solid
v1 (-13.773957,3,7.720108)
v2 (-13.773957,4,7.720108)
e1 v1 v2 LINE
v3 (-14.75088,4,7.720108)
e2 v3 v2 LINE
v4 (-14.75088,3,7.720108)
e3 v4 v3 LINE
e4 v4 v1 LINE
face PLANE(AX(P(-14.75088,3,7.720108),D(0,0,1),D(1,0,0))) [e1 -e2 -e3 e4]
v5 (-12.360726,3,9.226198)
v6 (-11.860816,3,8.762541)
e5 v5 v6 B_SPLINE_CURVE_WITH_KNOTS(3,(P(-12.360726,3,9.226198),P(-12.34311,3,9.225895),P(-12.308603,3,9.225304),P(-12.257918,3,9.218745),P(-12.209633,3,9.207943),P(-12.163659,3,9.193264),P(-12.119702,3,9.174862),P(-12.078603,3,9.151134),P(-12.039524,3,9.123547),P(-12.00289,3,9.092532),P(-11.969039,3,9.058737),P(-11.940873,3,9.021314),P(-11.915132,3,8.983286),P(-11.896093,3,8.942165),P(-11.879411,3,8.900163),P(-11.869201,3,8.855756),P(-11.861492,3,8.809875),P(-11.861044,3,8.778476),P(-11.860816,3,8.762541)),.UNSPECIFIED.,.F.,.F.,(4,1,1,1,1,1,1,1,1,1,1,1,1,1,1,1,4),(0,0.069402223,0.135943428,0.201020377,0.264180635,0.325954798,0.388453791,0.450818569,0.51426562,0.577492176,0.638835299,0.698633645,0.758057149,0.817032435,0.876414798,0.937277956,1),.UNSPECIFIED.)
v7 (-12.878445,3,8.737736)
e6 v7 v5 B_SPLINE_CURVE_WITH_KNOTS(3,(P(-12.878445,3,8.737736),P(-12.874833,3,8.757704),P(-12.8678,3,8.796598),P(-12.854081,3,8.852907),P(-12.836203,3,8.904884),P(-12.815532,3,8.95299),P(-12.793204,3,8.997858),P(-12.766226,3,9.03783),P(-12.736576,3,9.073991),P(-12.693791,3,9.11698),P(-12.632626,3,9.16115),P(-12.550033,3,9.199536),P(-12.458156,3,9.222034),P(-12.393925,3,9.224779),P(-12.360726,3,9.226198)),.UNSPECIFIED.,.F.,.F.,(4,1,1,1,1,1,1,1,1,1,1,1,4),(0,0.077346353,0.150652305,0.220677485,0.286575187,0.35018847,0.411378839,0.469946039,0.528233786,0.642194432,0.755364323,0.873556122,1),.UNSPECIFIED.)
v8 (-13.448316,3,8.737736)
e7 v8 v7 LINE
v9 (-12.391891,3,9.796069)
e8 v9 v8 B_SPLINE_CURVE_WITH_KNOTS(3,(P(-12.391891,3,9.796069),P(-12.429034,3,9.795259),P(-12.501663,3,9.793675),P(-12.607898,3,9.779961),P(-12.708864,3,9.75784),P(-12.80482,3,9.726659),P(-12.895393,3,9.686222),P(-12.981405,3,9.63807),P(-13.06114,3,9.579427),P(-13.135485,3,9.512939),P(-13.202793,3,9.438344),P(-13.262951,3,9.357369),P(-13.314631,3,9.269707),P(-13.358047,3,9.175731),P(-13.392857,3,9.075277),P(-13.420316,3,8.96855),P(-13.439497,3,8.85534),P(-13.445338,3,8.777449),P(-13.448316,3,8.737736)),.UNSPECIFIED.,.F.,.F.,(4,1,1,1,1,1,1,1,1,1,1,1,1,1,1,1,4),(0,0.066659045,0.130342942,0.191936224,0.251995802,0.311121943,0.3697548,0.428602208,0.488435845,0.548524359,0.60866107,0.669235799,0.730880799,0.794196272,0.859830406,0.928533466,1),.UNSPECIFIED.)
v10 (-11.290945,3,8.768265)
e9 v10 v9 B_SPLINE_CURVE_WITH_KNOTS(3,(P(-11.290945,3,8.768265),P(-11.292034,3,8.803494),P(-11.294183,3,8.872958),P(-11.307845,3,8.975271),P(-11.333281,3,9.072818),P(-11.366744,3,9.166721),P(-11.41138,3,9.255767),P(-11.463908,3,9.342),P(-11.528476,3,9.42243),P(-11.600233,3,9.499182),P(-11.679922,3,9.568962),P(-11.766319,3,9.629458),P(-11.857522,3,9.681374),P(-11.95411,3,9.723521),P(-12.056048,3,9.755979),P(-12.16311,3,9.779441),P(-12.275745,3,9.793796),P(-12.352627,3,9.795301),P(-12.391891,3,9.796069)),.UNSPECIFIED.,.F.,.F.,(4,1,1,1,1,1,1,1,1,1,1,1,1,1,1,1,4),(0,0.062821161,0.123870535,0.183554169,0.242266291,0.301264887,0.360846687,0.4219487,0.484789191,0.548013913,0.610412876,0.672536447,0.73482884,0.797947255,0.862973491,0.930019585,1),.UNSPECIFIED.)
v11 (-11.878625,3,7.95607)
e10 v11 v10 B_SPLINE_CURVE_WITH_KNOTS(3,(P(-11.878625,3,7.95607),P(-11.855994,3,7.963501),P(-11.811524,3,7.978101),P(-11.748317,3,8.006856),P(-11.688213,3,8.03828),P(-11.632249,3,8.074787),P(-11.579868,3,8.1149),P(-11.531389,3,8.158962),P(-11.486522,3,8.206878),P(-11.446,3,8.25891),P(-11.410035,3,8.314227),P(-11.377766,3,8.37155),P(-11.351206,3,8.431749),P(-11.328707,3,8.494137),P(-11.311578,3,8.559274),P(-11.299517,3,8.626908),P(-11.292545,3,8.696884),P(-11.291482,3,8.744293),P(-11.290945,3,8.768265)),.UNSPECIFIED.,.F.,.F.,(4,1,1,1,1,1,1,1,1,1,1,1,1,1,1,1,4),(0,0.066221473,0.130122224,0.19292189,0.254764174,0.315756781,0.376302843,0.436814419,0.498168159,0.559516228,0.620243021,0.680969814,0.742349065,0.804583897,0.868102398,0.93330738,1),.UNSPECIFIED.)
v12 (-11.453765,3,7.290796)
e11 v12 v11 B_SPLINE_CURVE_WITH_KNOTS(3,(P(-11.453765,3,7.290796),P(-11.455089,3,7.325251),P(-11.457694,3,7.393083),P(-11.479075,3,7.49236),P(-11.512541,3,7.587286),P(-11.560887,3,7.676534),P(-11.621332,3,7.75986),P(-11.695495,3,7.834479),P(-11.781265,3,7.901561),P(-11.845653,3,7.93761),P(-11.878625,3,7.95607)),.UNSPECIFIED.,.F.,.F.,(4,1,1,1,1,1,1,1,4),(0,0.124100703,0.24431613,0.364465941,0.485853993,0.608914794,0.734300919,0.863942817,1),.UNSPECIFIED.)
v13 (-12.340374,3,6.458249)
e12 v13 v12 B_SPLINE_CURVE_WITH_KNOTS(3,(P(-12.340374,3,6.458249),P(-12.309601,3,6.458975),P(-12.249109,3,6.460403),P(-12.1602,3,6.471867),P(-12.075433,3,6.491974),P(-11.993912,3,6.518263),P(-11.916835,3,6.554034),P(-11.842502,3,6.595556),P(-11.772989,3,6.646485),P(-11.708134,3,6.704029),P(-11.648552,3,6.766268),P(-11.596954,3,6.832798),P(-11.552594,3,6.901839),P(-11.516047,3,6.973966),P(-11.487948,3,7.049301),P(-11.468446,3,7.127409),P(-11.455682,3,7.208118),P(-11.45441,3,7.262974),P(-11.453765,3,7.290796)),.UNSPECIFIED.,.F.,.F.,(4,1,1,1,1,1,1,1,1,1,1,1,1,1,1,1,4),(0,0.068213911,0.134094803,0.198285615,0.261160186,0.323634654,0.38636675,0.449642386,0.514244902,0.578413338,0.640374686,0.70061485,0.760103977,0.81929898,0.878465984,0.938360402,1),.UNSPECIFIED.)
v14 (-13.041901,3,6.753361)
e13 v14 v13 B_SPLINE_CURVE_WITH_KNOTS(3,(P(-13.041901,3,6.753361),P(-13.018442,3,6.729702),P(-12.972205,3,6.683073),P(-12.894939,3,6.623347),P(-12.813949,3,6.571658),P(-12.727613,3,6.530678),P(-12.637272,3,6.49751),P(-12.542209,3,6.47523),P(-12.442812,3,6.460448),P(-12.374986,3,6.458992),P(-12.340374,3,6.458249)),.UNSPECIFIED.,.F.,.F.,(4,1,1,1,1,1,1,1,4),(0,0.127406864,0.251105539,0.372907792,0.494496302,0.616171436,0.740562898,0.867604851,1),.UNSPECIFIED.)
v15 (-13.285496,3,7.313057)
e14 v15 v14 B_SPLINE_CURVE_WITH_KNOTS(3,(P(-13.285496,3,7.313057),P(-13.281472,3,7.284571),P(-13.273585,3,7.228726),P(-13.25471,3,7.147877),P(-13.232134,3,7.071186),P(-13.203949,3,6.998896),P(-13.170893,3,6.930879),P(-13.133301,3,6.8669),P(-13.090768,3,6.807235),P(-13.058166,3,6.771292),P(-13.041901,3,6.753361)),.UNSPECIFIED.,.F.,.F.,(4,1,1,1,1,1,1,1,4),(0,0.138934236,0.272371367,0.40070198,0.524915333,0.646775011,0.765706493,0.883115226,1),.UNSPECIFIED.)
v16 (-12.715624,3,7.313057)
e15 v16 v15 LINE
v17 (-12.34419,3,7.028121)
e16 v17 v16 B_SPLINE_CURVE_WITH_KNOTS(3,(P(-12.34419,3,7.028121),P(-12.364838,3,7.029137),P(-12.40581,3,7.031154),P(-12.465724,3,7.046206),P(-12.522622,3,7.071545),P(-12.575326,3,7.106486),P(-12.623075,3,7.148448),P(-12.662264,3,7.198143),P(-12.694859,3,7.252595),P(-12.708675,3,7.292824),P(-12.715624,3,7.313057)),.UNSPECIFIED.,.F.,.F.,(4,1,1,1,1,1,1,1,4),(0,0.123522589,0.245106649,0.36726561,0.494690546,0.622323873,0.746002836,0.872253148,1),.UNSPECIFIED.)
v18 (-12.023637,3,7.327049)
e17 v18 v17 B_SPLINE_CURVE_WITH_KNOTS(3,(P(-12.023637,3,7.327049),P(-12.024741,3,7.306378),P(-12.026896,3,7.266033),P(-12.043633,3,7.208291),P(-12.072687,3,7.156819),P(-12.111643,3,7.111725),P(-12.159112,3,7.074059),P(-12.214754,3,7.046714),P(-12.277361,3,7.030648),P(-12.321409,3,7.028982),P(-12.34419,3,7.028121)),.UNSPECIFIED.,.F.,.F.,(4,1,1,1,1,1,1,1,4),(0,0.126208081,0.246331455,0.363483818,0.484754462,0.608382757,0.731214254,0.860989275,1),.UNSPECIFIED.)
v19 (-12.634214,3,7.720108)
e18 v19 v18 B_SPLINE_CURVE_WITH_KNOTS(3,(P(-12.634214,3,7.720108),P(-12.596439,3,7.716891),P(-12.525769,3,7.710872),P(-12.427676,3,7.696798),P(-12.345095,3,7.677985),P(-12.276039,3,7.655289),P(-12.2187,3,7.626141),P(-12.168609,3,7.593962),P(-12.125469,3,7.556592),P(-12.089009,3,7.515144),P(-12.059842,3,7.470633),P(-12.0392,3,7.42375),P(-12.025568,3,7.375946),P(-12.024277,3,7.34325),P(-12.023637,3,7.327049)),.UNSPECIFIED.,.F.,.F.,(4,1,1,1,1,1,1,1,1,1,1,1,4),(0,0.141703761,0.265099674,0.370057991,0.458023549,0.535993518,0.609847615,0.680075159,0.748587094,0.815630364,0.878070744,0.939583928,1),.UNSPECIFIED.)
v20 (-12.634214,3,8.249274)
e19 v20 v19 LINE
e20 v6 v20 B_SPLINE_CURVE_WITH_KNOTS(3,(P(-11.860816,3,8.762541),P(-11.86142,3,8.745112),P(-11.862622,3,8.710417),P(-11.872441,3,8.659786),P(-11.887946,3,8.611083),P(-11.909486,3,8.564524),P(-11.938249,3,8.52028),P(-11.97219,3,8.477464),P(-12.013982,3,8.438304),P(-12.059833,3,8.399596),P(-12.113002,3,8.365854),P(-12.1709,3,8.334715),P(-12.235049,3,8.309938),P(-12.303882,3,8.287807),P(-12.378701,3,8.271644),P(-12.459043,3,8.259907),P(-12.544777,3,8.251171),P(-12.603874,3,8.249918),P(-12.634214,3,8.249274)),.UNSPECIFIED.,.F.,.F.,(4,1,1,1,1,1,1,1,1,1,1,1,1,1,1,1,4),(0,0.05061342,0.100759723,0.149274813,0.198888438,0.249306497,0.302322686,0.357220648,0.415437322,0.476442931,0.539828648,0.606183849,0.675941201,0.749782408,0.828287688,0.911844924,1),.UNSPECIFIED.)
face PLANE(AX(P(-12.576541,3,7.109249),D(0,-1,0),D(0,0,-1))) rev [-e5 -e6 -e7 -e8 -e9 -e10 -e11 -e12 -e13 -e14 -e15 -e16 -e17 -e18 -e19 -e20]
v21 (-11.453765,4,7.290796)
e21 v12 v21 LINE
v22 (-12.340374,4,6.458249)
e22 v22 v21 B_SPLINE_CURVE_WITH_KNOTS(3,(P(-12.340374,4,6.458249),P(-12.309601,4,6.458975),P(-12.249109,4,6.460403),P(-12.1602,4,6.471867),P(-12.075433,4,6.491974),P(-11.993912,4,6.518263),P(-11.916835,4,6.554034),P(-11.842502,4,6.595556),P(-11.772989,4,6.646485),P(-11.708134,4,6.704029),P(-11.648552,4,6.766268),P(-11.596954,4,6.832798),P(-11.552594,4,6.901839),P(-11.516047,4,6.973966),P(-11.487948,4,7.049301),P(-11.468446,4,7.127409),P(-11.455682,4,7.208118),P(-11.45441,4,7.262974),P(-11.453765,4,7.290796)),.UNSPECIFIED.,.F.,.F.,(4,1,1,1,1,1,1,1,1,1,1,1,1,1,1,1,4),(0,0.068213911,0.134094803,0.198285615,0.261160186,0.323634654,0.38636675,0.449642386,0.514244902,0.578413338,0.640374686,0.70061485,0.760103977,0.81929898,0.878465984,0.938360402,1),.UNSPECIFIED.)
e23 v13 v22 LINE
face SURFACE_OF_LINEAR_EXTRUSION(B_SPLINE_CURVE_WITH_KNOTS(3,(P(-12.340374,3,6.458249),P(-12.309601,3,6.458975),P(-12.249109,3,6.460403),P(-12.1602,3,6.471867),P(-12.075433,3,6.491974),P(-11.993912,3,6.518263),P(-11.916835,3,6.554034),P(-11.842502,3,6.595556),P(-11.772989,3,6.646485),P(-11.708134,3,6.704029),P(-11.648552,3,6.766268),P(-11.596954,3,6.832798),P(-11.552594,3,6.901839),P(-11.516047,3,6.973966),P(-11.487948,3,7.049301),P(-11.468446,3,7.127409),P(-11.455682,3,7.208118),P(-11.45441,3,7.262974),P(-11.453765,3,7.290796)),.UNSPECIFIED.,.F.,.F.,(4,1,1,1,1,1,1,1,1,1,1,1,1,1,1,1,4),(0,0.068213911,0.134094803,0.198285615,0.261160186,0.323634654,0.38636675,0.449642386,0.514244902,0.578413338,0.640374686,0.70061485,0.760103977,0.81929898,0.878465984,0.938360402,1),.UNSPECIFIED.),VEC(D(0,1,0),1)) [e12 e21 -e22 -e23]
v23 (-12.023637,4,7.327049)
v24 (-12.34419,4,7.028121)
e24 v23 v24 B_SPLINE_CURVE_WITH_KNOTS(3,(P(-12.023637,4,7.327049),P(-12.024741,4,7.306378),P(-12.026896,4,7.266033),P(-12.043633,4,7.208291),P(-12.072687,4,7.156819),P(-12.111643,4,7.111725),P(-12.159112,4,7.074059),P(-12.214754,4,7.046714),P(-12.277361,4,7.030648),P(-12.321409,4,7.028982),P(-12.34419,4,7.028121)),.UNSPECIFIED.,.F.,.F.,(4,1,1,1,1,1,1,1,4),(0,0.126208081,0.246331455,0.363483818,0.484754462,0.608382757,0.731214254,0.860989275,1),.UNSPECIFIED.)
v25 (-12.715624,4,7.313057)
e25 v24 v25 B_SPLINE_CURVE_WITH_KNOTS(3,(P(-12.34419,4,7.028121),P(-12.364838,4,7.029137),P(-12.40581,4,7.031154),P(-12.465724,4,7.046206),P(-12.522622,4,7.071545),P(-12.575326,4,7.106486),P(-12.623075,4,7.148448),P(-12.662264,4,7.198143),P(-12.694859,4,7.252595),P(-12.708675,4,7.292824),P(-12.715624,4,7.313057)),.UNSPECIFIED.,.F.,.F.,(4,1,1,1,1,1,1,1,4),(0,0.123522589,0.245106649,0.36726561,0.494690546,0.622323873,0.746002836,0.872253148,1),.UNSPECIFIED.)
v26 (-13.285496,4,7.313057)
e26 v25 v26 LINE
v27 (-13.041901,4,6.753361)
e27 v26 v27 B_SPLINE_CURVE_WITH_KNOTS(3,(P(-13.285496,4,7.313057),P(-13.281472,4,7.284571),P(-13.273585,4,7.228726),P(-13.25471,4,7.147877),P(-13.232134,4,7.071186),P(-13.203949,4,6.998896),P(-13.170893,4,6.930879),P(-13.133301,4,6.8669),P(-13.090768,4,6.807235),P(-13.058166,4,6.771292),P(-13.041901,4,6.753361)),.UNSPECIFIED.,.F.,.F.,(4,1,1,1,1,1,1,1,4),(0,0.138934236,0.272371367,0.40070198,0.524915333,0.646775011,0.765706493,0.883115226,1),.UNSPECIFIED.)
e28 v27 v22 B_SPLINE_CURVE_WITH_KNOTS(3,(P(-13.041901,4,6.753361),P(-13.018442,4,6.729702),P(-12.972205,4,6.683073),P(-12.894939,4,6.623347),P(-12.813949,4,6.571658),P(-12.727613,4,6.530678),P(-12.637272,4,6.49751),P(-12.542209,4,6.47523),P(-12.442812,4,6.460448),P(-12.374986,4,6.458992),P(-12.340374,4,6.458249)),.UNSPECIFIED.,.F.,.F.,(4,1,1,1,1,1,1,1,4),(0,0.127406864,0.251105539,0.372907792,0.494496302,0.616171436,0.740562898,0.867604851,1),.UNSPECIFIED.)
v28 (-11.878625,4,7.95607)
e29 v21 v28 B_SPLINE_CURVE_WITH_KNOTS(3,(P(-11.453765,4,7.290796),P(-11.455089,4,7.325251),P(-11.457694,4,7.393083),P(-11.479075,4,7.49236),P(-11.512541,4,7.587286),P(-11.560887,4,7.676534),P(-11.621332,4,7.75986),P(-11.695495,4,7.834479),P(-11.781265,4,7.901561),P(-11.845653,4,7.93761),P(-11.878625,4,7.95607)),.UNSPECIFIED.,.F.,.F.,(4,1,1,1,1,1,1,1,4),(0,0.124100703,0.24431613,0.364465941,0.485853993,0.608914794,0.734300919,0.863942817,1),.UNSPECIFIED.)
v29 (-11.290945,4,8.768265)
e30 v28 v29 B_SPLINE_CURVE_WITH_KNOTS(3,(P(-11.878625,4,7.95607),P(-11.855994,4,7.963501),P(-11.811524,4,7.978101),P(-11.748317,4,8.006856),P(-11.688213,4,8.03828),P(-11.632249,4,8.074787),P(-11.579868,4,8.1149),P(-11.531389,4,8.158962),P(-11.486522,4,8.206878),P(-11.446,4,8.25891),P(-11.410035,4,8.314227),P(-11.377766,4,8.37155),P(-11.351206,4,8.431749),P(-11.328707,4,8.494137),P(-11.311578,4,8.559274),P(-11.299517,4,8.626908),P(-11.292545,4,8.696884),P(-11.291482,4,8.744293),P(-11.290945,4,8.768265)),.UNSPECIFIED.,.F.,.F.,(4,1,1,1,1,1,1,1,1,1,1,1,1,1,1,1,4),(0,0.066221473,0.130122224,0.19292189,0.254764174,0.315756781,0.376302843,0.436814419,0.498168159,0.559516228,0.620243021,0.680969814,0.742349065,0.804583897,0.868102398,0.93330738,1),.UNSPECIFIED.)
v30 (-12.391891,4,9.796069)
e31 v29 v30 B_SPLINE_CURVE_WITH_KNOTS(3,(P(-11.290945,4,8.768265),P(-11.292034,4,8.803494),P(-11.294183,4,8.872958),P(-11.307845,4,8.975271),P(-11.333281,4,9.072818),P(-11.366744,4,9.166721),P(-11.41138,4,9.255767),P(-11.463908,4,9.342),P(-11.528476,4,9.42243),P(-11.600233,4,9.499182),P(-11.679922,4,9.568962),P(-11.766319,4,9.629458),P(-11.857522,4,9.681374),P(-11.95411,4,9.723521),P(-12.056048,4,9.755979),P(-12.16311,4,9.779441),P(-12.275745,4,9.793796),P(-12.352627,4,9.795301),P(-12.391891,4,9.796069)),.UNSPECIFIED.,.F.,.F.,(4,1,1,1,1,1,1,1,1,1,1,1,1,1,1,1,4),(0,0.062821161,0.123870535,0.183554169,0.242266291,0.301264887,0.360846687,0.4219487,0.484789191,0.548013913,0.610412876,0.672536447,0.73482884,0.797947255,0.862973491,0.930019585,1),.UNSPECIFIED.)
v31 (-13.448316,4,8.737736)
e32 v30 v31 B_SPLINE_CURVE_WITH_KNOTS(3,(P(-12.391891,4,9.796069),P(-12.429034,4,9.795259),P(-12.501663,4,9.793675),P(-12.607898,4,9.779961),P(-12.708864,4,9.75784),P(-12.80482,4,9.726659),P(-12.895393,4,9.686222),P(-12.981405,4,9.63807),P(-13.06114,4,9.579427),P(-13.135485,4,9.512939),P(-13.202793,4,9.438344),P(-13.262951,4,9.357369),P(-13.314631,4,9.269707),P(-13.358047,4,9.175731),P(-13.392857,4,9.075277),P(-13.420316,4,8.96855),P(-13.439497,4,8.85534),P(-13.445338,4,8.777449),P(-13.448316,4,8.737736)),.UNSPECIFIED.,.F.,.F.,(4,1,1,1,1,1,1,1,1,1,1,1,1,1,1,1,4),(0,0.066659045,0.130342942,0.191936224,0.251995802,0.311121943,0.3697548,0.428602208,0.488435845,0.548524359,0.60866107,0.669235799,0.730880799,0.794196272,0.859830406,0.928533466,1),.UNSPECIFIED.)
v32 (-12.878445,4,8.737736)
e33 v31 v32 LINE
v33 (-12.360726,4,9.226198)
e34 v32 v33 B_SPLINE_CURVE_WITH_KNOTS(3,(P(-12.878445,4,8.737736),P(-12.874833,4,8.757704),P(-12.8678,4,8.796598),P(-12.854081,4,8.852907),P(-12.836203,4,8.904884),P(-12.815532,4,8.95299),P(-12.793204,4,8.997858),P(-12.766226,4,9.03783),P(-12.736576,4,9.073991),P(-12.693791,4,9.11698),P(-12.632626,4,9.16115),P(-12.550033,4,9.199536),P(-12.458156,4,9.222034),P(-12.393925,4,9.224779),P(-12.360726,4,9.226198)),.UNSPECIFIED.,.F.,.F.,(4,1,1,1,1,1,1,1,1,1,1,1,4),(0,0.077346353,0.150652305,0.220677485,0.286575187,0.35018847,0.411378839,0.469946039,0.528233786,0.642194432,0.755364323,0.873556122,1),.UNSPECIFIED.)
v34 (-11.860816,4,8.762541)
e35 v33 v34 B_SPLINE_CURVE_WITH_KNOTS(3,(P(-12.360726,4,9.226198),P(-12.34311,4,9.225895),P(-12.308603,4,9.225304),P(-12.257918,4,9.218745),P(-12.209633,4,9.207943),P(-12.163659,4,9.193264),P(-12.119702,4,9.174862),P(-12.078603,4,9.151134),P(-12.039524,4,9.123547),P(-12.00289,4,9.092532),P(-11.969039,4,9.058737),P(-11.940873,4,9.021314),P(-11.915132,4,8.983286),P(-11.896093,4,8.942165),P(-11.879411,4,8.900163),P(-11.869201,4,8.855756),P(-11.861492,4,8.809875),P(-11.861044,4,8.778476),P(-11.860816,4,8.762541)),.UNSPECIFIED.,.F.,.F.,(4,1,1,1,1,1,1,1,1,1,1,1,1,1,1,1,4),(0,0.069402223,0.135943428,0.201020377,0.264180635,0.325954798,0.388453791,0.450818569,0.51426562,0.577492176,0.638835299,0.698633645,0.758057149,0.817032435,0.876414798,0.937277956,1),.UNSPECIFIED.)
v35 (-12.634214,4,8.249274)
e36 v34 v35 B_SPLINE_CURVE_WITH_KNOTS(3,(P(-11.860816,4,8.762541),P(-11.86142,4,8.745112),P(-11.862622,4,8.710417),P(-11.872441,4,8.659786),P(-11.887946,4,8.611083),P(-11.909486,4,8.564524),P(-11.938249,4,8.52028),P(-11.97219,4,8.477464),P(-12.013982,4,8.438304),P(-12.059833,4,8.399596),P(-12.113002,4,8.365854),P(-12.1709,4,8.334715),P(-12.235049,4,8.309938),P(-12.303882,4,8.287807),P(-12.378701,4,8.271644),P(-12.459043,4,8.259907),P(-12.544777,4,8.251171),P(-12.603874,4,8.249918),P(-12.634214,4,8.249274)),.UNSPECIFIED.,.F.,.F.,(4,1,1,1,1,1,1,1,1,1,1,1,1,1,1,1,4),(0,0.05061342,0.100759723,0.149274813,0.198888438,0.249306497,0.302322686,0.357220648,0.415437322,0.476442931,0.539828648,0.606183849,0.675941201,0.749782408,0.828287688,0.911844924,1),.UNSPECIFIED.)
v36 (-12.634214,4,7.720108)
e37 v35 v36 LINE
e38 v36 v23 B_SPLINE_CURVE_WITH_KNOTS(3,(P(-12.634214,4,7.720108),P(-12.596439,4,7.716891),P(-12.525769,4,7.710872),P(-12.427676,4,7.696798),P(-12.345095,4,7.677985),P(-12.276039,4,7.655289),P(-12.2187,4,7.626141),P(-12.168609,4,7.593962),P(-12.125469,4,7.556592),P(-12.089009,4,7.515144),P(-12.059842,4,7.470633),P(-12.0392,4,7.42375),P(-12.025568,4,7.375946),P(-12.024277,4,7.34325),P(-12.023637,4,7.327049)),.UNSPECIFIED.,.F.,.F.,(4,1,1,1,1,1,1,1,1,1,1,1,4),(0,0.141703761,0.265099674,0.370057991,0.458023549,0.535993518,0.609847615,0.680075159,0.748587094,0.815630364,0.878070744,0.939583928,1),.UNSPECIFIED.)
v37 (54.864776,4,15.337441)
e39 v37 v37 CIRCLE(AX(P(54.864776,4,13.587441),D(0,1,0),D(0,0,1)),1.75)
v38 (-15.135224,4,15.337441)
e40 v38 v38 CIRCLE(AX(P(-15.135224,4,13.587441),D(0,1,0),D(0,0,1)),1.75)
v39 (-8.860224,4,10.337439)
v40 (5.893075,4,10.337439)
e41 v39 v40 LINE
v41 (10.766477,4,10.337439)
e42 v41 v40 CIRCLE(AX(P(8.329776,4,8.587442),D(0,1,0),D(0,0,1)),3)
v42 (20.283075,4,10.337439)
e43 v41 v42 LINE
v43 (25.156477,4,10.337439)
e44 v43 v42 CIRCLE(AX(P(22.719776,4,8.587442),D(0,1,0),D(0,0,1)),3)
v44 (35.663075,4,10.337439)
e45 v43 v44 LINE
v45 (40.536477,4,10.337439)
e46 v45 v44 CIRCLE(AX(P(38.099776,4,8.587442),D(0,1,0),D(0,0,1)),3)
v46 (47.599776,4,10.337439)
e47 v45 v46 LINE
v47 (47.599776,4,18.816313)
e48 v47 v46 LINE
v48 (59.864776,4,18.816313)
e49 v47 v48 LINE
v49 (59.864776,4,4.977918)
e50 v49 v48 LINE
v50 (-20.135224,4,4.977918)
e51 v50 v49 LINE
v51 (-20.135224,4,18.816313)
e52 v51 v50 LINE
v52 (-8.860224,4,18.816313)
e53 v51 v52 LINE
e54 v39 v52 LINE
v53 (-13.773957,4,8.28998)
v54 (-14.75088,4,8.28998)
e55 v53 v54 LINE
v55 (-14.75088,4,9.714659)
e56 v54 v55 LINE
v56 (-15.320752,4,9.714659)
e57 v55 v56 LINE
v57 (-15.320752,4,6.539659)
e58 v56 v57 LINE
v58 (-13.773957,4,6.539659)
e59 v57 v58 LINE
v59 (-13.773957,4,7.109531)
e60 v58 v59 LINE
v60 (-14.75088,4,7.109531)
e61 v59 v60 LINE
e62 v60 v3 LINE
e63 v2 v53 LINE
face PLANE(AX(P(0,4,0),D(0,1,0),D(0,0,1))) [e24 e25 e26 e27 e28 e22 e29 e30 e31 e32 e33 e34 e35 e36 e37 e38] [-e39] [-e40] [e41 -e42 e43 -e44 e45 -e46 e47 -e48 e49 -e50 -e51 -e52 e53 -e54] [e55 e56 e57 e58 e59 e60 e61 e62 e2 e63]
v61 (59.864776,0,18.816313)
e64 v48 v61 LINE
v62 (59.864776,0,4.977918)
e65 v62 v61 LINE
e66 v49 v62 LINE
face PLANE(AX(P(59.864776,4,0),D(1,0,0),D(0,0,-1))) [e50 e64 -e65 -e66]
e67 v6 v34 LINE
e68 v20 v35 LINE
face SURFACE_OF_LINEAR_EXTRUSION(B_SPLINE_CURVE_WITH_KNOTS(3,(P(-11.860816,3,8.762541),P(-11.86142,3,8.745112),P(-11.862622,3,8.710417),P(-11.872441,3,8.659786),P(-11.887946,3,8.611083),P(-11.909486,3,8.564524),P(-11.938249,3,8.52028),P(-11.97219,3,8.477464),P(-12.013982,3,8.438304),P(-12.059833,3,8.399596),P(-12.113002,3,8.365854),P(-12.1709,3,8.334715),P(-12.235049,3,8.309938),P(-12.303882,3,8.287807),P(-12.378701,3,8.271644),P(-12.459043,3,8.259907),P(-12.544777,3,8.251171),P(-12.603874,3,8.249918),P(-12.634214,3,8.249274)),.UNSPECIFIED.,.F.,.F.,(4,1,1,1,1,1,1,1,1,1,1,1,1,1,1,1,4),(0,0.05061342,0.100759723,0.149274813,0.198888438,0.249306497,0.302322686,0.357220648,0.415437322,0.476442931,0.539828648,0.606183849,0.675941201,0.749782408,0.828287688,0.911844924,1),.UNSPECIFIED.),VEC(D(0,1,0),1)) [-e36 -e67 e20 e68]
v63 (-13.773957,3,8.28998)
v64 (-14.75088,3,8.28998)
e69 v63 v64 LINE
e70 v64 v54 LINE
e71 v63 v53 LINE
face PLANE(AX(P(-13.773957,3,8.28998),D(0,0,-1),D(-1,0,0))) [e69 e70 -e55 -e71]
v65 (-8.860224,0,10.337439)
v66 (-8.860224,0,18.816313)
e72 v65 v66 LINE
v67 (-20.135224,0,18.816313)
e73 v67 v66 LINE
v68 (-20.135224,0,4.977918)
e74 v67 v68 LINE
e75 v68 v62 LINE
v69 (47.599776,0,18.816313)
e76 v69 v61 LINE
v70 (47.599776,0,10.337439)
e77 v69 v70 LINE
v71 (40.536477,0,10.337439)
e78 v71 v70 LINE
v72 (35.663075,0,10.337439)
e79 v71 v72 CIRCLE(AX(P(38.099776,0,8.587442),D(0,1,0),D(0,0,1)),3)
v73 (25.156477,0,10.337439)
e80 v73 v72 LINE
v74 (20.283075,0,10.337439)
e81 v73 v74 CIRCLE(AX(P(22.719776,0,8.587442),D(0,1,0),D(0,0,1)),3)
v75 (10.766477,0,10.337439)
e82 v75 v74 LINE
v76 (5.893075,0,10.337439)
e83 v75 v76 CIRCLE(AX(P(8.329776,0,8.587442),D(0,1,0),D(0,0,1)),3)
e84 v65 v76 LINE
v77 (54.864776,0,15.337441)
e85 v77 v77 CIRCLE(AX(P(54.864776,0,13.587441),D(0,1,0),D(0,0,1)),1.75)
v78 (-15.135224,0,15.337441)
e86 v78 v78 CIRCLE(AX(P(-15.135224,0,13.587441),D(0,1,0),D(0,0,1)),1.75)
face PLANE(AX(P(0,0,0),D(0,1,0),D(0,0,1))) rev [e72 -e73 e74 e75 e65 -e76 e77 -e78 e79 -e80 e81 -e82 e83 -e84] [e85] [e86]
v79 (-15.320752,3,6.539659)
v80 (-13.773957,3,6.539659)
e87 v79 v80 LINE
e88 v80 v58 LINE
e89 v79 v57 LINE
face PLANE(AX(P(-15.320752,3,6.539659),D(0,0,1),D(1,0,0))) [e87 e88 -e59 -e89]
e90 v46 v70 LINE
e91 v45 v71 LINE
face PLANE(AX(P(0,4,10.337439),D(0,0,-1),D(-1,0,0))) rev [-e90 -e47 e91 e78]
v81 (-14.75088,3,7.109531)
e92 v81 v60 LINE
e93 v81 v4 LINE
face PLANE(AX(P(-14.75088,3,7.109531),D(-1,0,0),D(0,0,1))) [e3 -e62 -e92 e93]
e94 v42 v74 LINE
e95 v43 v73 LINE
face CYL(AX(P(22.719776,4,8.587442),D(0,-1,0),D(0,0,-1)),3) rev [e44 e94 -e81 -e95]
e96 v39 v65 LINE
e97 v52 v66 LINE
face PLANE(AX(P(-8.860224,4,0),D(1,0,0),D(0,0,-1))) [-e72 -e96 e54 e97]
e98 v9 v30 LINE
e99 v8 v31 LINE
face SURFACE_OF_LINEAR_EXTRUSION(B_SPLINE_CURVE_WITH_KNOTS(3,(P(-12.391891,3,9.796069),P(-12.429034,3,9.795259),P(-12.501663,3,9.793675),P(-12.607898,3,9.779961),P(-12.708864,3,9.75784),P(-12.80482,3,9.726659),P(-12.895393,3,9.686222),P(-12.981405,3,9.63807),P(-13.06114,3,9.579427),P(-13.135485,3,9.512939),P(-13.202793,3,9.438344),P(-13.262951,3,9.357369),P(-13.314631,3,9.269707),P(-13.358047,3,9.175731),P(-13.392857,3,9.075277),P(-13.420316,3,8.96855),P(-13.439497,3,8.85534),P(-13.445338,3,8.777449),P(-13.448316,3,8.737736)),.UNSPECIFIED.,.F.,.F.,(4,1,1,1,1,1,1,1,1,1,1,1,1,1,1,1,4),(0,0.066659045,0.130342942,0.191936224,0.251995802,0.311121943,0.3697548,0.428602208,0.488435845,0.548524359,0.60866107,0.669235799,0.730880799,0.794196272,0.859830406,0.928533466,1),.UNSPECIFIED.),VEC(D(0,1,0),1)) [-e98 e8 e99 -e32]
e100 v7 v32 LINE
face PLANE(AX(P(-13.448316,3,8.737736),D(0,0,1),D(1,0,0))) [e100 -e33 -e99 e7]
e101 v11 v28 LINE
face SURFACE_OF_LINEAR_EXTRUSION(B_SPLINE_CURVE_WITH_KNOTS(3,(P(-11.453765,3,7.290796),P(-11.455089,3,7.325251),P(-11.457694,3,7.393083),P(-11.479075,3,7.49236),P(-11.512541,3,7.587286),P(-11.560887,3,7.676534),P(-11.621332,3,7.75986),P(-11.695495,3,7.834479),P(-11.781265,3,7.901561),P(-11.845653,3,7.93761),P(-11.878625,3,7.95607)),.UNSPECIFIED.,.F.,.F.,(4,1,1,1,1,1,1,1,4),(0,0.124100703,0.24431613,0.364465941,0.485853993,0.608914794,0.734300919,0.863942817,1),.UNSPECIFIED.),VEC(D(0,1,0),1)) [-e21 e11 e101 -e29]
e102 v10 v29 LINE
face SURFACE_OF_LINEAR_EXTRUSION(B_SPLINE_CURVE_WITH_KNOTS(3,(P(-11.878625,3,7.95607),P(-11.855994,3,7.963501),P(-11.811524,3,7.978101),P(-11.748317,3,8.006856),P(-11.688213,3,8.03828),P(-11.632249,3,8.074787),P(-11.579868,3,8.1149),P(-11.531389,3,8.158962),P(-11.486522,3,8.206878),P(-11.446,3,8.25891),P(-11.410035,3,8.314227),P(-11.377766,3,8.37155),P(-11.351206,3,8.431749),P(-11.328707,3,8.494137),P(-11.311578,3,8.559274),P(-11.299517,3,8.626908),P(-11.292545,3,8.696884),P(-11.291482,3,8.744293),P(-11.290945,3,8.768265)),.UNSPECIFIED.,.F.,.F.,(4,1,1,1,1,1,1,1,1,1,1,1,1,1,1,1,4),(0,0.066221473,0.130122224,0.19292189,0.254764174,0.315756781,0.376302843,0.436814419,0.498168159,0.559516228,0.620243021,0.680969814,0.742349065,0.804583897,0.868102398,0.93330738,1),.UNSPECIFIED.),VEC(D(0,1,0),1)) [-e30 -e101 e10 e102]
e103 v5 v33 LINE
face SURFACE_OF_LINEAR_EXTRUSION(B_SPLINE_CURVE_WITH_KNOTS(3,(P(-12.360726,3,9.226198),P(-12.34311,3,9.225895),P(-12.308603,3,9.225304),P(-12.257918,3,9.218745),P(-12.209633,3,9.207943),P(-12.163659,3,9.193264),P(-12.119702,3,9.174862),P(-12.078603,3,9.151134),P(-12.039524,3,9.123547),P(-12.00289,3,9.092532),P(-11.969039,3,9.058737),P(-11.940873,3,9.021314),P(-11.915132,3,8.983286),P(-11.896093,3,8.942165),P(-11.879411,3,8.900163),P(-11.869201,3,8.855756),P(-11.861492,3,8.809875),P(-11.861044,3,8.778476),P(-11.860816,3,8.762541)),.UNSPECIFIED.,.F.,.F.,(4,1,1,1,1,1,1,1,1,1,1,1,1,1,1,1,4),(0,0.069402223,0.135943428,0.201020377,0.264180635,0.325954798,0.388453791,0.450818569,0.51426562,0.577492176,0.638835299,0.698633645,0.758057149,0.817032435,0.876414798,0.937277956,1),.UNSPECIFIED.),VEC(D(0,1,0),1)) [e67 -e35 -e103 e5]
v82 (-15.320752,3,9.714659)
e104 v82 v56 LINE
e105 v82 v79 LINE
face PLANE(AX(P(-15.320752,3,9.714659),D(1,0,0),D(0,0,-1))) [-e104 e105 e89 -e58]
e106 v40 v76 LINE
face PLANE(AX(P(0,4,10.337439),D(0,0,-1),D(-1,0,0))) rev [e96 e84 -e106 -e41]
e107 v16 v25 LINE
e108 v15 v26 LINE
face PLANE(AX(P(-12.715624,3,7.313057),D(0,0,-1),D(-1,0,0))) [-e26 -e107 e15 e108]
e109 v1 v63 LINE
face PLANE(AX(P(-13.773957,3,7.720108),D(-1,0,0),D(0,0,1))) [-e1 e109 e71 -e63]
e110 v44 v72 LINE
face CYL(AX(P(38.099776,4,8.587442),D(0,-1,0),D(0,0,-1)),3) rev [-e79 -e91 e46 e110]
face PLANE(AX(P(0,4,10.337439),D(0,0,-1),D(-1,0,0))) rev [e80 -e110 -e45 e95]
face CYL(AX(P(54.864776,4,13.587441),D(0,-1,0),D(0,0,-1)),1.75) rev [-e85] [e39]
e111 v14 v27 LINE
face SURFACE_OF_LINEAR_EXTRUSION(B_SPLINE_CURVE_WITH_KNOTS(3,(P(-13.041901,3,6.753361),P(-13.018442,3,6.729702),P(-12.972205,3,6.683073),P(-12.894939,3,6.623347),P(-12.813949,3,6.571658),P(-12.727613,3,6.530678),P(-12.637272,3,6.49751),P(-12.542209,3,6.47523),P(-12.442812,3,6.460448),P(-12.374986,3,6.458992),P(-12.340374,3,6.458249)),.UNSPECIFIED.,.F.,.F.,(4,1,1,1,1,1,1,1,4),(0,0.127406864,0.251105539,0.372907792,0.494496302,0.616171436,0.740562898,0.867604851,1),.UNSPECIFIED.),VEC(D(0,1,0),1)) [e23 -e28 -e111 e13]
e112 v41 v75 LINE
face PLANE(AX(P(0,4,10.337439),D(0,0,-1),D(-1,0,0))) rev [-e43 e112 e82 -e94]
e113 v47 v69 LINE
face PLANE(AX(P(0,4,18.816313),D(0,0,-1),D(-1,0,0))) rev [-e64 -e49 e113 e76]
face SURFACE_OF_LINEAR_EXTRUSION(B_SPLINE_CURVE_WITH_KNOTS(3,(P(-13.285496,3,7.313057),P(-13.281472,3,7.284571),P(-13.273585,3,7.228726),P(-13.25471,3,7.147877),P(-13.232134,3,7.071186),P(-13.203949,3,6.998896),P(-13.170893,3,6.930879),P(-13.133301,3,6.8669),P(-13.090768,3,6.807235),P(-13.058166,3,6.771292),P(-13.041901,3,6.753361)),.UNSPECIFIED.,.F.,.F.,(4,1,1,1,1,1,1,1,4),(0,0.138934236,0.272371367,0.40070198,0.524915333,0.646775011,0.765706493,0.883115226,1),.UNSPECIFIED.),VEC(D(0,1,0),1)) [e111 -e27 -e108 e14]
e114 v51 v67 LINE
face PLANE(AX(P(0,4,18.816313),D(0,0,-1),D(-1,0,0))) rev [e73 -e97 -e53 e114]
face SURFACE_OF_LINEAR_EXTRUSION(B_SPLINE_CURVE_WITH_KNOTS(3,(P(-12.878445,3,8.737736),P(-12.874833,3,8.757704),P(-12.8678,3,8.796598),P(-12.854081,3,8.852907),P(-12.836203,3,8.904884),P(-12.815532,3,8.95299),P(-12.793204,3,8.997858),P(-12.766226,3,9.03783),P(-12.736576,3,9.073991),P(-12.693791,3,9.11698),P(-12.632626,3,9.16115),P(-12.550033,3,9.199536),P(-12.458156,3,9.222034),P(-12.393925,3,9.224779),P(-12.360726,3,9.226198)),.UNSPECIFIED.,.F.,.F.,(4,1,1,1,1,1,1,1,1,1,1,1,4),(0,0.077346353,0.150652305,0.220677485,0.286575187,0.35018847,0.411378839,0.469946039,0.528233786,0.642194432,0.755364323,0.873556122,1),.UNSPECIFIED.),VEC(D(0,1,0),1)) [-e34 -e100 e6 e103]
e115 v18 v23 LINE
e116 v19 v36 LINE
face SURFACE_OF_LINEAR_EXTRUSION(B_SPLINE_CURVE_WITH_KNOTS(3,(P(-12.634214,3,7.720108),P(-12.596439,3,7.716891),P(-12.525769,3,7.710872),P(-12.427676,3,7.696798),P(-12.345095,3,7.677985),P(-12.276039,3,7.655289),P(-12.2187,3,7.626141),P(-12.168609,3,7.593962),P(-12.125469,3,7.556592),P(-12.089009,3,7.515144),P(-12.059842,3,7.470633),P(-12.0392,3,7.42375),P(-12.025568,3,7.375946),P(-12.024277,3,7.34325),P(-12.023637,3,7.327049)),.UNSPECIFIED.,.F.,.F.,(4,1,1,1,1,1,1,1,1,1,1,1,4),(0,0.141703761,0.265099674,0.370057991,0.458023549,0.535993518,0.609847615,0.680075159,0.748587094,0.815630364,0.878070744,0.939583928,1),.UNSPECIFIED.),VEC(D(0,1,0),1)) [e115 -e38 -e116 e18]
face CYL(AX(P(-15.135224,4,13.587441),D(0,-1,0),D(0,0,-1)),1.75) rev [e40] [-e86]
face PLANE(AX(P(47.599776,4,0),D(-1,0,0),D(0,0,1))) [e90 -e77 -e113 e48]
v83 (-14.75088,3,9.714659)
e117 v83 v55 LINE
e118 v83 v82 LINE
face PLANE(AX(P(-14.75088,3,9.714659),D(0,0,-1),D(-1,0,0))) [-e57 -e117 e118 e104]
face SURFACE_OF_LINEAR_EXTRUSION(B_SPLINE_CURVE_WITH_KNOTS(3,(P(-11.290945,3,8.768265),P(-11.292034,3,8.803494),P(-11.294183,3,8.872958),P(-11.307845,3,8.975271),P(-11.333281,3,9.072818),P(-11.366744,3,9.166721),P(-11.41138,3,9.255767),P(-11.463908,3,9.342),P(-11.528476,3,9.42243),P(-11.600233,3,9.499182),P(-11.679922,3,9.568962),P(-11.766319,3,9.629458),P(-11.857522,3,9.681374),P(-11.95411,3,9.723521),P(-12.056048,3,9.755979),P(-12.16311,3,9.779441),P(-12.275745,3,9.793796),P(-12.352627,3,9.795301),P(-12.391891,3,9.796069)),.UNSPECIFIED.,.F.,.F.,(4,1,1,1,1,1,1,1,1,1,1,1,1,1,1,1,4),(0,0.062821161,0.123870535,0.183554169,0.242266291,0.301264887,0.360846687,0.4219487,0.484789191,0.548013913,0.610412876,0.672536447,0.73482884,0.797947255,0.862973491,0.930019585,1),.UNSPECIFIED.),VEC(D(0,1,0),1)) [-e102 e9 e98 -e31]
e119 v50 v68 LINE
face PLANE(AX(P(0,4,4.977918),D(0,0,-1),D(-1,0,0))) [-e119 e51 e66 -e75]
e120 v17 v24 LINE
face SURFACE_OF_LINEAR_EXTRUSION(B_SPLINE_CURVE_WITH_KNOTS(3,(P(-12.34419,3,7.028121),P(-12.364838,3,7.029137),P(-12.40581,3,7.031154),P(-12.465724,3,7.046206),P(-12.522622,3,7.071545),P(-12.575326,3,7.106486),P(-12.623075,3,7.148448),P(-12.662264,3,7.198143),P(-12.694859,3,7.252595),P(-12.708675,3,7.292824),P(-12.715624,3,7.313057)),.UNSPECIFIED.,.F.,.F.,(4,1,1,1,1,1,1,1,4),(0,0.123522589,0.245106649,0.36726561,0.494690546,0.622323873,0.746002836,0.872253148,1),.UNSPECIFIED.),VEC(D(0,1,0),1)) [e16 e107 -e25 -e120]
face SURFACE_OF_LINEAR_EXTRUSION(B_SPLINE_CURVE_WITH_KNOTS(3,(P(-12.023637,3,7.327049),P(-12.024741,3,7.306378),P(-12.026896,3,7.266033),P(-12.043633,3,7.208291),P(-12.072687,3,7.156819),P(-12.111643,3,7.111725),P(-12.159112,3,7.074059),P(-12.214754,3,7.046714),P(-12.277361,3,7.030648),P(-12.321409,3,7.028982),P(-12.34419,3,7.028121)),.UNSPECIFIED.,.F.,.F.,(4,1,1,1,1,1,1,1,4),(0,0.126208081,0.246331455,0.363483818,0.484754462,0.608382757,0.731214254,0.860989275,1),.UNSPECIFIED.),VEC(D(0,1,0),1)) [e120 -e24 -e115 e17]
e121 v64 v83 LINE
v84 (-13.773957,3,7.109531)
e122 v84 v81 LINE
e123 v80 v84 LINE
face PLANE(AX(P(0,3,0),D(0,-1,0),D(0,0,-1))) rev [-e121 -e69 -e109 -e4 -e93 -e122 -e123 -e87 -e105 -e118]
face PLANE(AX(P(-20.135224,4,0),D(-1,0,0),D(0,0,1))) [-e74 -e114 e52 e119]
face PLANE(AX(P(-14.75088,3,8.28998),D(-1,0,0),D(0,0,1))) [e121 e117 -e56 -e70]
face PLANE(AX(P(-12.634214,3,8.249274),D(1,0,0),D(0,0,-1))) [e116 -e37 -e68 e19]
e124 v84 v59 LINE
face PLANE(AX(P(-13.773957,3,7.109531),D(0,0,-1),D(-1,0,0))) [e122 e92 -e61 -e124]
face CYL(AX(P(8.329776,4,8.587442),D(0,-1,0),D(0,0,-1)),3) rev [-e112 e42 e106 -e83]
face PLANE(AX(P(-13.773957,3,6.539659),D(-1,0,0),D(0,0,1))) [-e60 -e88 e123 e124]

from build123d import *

# Parameters (mm, degrees)
SKETCH1_R           = 1.75
BOSS_EXTRUDE1_DEPTH = 4
CUT_EXTRUDE1_DEPTH  = 1


with BuildPart() as part:
    # Sketch1 → Boss-Extrude1 (new body)
    with BuildSketch(Plane(origin=(0, 0, 0), x_dir=(1, 0, 0), z_dir=(0, 1, 0))):
        with BuildLine():
            Line((-20.135223818, -18.81631321), (-8.860223818, -18.81631321))
            Line((-8.860223818, -18.81631321), (-8.860223818, -10.337442774))
            Line((-8.860223818, -10.337442774), (5.893076938, -10.33744141))
            ThreePointArc((5.893076938, -10.33744141), (8.329775763, -5.587442326), (10.766475916, -10.337440728))
            Line((10.766475916, -10.337440728), (20.283076449, -10.337440728))
            ThreePointArc((20.283076449, -10.337440728), (22.719776182, -5.587442326), (25.156475916, -10.337440728))
            Line((25.156475916, -10.337440728), (35.663076449, -10.337440728))
            ThreePointArc((35.663076449, -10.337440728), (38.099775199, -5.587442326), (40.536477064, -10.33743913))
            Line((40.536477064, -10.33743913), (47.599776182, -10.33743913))
            Line((47.599776182, -10.33743913), (47.599776182, -18.81631321))
            Line((47.599776182, -18.81631321), (59.864776182, -18.81631321))
            Line((59.864776182, -18.81631321), (59.864776182, -4.977918302))
            Line((59.864776182, -4.977918302), (-20.135223818, -4.977918302))
            Line((-20.135223818, -4.977918302), (-20.135223818, -18.81631321))
        make_face()
        with Locations((-15.135223818, -13.587440845)):
            Circle(SKETCH1_R, mode=Mode.SUBTRACT)
        with Locations((54.864776182, -13.587440845)):
            Circle(SKETCH1_R, mode=Mode.SUBTRACT)
    extrude(amount=BOSS_EXTRUDE1_DEPTH)

    # Sketch2 → Cut-Extrude1 (cut)
    with BuildSketch(Plane(origin=(0, 4, 0), x_dir=(1, 0, 0), z_dir=(0, 1, 0))):
        Polygon((-15.320752279, -6.539659084), (-13.773957408, -6.539659084), (-13.773957408, -7.109530878), (-14.750880484, -7.109530878), (-14.750880484, -7.720107802), (-13.773957408, -7.720107802), (-13.773957408, -8.289979596), (-14.750880484, -8.289979596), (-14.750880484, -9.714659084), (-15.320752279, -9.714659084), align=None)
        with BuildLine():
            Line((-12.715624074, -7.31305652), (-13.285495869, -7.31305652))
            add(Edge.make_bspline(
                [(-13.285495869, -7.31305652), (-13.281472358, -7.284570661), (-13.27358453, -7.228726024), (-13.254710012, -7.1478769), (-13.232134053, -7.071185973), (-13.20394912, -6.998896107), (-13.17089278, -6.93087853), (-13.133301178, -6.86689984), (-13.090767935, -6.807234643), (-13.058165754, -6.771292092), (-13.041901118, -6.753361007)],
                knots=[0, 0, 0, 0, 1.111473889, 2.178970933, 3.205615836, 4.199322666, 5.174200091, 6.12565194, 7.064921805, 8, 8, 8, 8], degree=3))
            add(Edge.make_bspline(
                [(-13.041901118, -6.753361007), (-13.018441535, -6.729702238), (-12.972205164, -6.683073292), (-12.894938765, -6.623346763), (-12.813949309, -6.571657514), (-12.727612518, -6.530677903), (-12.637271857, -6.497509656), (-12.542208906, -6.475230469), (-12.442812126, -6.460448032), (-12.374986328, -6.458991911), (-12.340373674, -6.458248827)],
                knots=[0, 0, 0, 0, 1.01925491, 2.00884431, 2.983262333, 3.955970413, 4.92937149, 5.924503185, 6.940838805, 8, 8, 8, 8], degree=3))
            add(Edge.make_bspline(
                [(-12.340373674, -6.458248827), (-12.309601243, -6.458975304), (-12.249108846, -6.460403411), (-12.160200243, -6.471867479), (-12.07543333, -6.491974177), (-11.993912097, -6.518263234), (-11.916835455, -6.554033889), (-11.842502249, -6.595556006), (-11.772989349, -6.646484608), (-11.70813411, -6.704028804), (-11.648552204, -6.766268484), (-11.596954011, -6.832797584), (-11.55259412, -6.901838958), (-11.516047437, -6.973966208), (-11.487948004, -7.049301384), (-11.468446164, -7.127409284), (-11.455681736, -7.208117556), (-11.454410065, -7.262973882), (-11.4537651, -7.290795903)],
                knots=[0, 0, 0, 0, 1.091422571, 2.145516843, 3.172569842, 4.178562979, 5.178154469, 6.181868002, 7.194278174, 8.227918432, 9.254613415, 10.245994977, 11.209837596, 12.161663635, 13.10878368, 14.055455738, 15.013766427, 16, 16, 16, 16], degree=3))
            add(Edge.make_bspline(
                [(-11.4537651, -7.290795903), (-11.455088608, -7.325251158), (-11.457694188, -7.393082963), (-11.479074861, -7.492359849), (-11.512541427, -7.58728627), (-11.560887138, -7.67653406), (-11.62133159, -7.759860338), (-11.695494907, -7.834479257), (-11.781264727, -7.901560739), (-11.845653274, -7.937610336), (-11.878624876, -7.956070342)],
                knots=[0, 0, 0, 0, 0.992805628, 1.954529043, 2.915727527, 3.886831945, 4.871318353, 5.87440735, 6.911542536, 8, 8, 8, 8], degree=3))
            add(Edge.make_bspline(
                [(-11.878624876, -7.956070342), (-11.855993674, -7.963500642), (-11.811524378, -7.978100848), (-11.748316621, -8.006855789), (-11.688213266, -8.038280173), (-11.632249272, -8.074787023), (-11.57986801, -8.114900165), (-11.531388801, -8.1589625), (-11.486521994, -8.206877951), (-11.446000021, -8.258910035), (-11.410035187, -8.314226601), (-11.377765856, -8.371549868), (-11.351206398, -8.431749155), (-11.328707231, -8.494136944), (-11.311577646, -8.559273944), (-11.299516887, -8.626907755), (-11.292545473, -8.6968841), (-11.291482213, -8.744293031), (-11.290944587, -8.768264853)],
                knots=[0, 0, 0, 0, 1.059543567, 2.081955587, 3.086750234, 4.076226789, 5.052108497, 6.020845489, 6.989030705, 7.970690546, 8.952259656, 9.923888338, 10.895517021, 11.877585046, 12.873342345, 13.889638361, 14.932918083, 16, 16, 16, 16], degree=3))
            add(Edge.make_bspline(
                [(-11.290944587, -8.768264853), (-11.292034427, -8.803493698), (-11.294183369, -8.872957806), (-11.30784534, -8.975271328), (-11.333281467, -9.072818182), (-11.366744101, -9.16672079), (-11.411379623, -9.255766904), (-11.463908129, -9.342000012), (-11.528476217, -9.422429573), (-11.600232559, -9.499181935), (-11.679922161, -9.568961747), (-11.766318654, -9.629457703), (-11.857522252, -9.681373997), (-11.954109976, -9.723521124), (-12.056048269, -9.755979232), (-12.163109918, -9.779441448), (-12.275744768, -9.793796021), (-12.352626866, -9.795300826), (-12.391891101, -9.79606934)],
                knots=[0, 0, 0, 0, 1.005138573, 1.981928558, 2.936866704, 3.876260664, 4.820238198, 5.773547, 6.751179199, 7.756627054, 8.768222608, 9.766606018, 10.760583154, 11.757261445, 12.767156078, 13.807575856, 14.880313354, 16, 16, 16, 16], degree=3))
            add(Edge.make_bspline(
                [(-12.391891101, -9.79606934), (-12.429034435, -9.795259071), (-12.501663309, -9.793674698), (-12.607898237, -9.779961147), (-12.708864481, -9.757840075), (-12.804819707, -9.726658589), (-12.895392673, -9.686221532), (-12.98140473, -9.638070069), (-13.061139525, -9.579426938), (-13.135485462, -9.512939399), (-13.202793323, -9.438344155), (-13.2629507, -9.357369168), (-13.314631113, -9.269706524), (-13.358046503, -9.175730754), (-13.39285746, -9.075276996), (-13.420316241, -8.968549527), (-13.439496649, -8.855339836), (-13.445338083, -8.77744916), (-13.448316382, -8.737736007)],
                knots=[0, 0, 0, 0, 1.066544725, 2.085487077, 3.070979577, 4.031932826, 4.977951092, 5.916076795, 6.857635327, 7.814973522, 8.776389752, 9.738577119, 10.707772778, 11.69409279, 12.707140348, 13.757286496, 14.856535458, 16, 16, 16, 16], degree=3))
            Line((-13.448316382, -8.737736007), (-12.878444587, -8.737736007))
            add(Edge.make_bspline(
                [(-12.878444587, -8.737736007), (-12.874833369, -8.757704302), (-12.867799575, -8.796597793), (-12.85408059, -8.852906922), (-12.836202839, -8.904883726), (-12.815531711, -8.952990173), (-12.793203781, -8.997857884), (-12.766226302, -9.037829784), (-12.736576042, -9.073991275), (-12.693790501, -9.116980452), (-12.632625623, -9.161150038), (-12.550032773, -9.199535509), (-12.45815605, -9.222034111), (-12.393925058, -9.224778872), (-12.360726238, -9.226197545)],
                knots=[0, 0, 0, 0, 0.928156231, 1.807827665, 2.648129825, 3.438902246, 4.202261636, 4.936546065, 5.639352463, 6.338805438, 7.70633318, 9.064371875, 10.482673459, 12, 12, 12, 12], degree=3))
            add(Edge.make_bspline(
                [(-12.360726238, -9.226197545), (-12.34310977, -9.225895452), (-12.308603052, -9.225303719), (-12.257917821, -9.218745152), (-12.209633001, -9.207943188), (-12.163658661, -9.193263718), (-12.119702124, -9.174862085), (-12.078603224, -9.15113428), (-12.039524263, -9.12354732), (-12.002890065, -9.092532254), (-11.969039311, -9.058736934), (-11.940873493, -9.021314358), (-11.915131973, -8.983286333), (-11.896093359, -8.94216493), (-11.879411432, -8.900162922), (-11.869201241, -8.855755765), (-11.861491813, -8.809875003), (-11.861043772, -8.778476224), (-11.860816382, -8.762540694)],
                knots=[0, 0, 0, 0, 1.110435564, 2.175094844, 3.216326037, 4.226890168, 5.215276772, 6.21526065, 7.213097102, 8.228249917, 9.239874822, 10.221364777, 11.178138315, 12.128914389, 13.072518965, 14.022636769, 14.996447288, 16, 16, 16, 16], degree=3))
            add(Edge.make_bspline(
                [(-11.860816382, -8.762540694), (-11.86142006, -8.745112478), (-11.862621845, -8.710416892), (-11.872440552, -8.65978598), (-11.887946365, -8.611083124), (-11.909485835, -8.564524002), (-11.938249395, -8.520280222), (-11.972190076, -8.47746412), (-12.013981841, -8.438304198), (-12.059833004, -8.399595801), (-12.113002341, -8.365853754), (-12.170900429, -8.334714802), (-12.235048922, -8.30993781), (-12.303881896, -8.287807366), (-12.378701392, -8.271643634), (-12.459042809, -8.259907189), (-12.544776544, -8.251171225), (-12.603873921, -8.249917907), (-12.634213818, -8.249274468)],
                knots=[0, 0, 0, 0, 0.809814727, 1.612155564, 2.388397, 3.182215007, 3.988903953, 4.837162975, 5.715530372, 6.646997145, 7.623086902, 8.637258368, 9.698941581, 10.815059213, 11.996518529, 13.252603015, 14.589518788, 16, 16, 16, 16], degree=3))
            Line((-12.634213818, -8.249274468), (-12.634213818, -7.720107802))
            add(Edge.make_bspline(
                [(-12.634213818, -7.720107802), (-12.596438842, -7.716890764), (-12.525769343, -7.710872323), (-12.42767629, -7.69679799), (-12.345094583, -7.677985328), (-12.276039371, -7.655288868), (-12.218700348, -7.626140701), (-12.168609294, -7.593962412), (-12.125468509, -7.556592032), (-12.089008758, -7.51514394), (-12.059842092, -7.470632577), (-12.039199625, -7.423749779), (-12.025568418, -7.37594616), (-12.024276862, -7.343249925), (-12.023636895, -7.327048907)],
                knots=[0, 0, 0, 0, 1.70044513, 3.18119609, 4.440695891, 5.496282586, 6.431922213, 7.318171381, 8.16090191, 8.983045123, 9.787564368, 10.536848927, 11.275007137, 12, 12, 12, 12], degree=3))
            add(Edge.make_bspline(
                [(-12.023636895, -7.327048907), (-12.024741021, -7.306378167), (-12.026896043, -7.26603326), (-12.043633107, -7.208291197), (-12.072686755, -7.156818934), (-12.111642594, -7.111724783), (-12.159111639, -7.074058769), (-12.214753681, -7.046713885), (-12.277361285, -7.030647544), (-12.321409108, -7.028982006), (-12.344189779, -7.028120622)],
                knots=[0, 0, 0, 0, 1.009664648, 1.970651636, 2.907870547, 3.878035693, 4.867062054, 5.849714035, 6.887914197, 8, 8, 8, 8], degree=3))
            add(Edge.make_bspline(
                [(-12.344189779, -7.028120622), (-12.364837897, -7.029136964), (-12.405810086, -7.031153699), (-12.46572369, -7.046206069), (-12.522621653, -7.071544861), (-12.575325778, -7.106485562), (-12.623075271, -7.148447862), (-12.662263828, -7.198143497), (-12.694859012, -7.252595115), (-12.708675252, -7.29282371), (-12.715624074, -7.31305652)],
                knots=[0, 0, 0, 0, 0.98818071, 1.960853194, 2.938124878, 3.957524365, 4.978590984, 5.968022688, 6.978025184, 8, 8, 8, 8], degree=3))
        make_face()
    extrude(amount=-CUT_EXTRUDE1_DEPTH, mode=Mode.SUBTRACT)


solid = part.part
